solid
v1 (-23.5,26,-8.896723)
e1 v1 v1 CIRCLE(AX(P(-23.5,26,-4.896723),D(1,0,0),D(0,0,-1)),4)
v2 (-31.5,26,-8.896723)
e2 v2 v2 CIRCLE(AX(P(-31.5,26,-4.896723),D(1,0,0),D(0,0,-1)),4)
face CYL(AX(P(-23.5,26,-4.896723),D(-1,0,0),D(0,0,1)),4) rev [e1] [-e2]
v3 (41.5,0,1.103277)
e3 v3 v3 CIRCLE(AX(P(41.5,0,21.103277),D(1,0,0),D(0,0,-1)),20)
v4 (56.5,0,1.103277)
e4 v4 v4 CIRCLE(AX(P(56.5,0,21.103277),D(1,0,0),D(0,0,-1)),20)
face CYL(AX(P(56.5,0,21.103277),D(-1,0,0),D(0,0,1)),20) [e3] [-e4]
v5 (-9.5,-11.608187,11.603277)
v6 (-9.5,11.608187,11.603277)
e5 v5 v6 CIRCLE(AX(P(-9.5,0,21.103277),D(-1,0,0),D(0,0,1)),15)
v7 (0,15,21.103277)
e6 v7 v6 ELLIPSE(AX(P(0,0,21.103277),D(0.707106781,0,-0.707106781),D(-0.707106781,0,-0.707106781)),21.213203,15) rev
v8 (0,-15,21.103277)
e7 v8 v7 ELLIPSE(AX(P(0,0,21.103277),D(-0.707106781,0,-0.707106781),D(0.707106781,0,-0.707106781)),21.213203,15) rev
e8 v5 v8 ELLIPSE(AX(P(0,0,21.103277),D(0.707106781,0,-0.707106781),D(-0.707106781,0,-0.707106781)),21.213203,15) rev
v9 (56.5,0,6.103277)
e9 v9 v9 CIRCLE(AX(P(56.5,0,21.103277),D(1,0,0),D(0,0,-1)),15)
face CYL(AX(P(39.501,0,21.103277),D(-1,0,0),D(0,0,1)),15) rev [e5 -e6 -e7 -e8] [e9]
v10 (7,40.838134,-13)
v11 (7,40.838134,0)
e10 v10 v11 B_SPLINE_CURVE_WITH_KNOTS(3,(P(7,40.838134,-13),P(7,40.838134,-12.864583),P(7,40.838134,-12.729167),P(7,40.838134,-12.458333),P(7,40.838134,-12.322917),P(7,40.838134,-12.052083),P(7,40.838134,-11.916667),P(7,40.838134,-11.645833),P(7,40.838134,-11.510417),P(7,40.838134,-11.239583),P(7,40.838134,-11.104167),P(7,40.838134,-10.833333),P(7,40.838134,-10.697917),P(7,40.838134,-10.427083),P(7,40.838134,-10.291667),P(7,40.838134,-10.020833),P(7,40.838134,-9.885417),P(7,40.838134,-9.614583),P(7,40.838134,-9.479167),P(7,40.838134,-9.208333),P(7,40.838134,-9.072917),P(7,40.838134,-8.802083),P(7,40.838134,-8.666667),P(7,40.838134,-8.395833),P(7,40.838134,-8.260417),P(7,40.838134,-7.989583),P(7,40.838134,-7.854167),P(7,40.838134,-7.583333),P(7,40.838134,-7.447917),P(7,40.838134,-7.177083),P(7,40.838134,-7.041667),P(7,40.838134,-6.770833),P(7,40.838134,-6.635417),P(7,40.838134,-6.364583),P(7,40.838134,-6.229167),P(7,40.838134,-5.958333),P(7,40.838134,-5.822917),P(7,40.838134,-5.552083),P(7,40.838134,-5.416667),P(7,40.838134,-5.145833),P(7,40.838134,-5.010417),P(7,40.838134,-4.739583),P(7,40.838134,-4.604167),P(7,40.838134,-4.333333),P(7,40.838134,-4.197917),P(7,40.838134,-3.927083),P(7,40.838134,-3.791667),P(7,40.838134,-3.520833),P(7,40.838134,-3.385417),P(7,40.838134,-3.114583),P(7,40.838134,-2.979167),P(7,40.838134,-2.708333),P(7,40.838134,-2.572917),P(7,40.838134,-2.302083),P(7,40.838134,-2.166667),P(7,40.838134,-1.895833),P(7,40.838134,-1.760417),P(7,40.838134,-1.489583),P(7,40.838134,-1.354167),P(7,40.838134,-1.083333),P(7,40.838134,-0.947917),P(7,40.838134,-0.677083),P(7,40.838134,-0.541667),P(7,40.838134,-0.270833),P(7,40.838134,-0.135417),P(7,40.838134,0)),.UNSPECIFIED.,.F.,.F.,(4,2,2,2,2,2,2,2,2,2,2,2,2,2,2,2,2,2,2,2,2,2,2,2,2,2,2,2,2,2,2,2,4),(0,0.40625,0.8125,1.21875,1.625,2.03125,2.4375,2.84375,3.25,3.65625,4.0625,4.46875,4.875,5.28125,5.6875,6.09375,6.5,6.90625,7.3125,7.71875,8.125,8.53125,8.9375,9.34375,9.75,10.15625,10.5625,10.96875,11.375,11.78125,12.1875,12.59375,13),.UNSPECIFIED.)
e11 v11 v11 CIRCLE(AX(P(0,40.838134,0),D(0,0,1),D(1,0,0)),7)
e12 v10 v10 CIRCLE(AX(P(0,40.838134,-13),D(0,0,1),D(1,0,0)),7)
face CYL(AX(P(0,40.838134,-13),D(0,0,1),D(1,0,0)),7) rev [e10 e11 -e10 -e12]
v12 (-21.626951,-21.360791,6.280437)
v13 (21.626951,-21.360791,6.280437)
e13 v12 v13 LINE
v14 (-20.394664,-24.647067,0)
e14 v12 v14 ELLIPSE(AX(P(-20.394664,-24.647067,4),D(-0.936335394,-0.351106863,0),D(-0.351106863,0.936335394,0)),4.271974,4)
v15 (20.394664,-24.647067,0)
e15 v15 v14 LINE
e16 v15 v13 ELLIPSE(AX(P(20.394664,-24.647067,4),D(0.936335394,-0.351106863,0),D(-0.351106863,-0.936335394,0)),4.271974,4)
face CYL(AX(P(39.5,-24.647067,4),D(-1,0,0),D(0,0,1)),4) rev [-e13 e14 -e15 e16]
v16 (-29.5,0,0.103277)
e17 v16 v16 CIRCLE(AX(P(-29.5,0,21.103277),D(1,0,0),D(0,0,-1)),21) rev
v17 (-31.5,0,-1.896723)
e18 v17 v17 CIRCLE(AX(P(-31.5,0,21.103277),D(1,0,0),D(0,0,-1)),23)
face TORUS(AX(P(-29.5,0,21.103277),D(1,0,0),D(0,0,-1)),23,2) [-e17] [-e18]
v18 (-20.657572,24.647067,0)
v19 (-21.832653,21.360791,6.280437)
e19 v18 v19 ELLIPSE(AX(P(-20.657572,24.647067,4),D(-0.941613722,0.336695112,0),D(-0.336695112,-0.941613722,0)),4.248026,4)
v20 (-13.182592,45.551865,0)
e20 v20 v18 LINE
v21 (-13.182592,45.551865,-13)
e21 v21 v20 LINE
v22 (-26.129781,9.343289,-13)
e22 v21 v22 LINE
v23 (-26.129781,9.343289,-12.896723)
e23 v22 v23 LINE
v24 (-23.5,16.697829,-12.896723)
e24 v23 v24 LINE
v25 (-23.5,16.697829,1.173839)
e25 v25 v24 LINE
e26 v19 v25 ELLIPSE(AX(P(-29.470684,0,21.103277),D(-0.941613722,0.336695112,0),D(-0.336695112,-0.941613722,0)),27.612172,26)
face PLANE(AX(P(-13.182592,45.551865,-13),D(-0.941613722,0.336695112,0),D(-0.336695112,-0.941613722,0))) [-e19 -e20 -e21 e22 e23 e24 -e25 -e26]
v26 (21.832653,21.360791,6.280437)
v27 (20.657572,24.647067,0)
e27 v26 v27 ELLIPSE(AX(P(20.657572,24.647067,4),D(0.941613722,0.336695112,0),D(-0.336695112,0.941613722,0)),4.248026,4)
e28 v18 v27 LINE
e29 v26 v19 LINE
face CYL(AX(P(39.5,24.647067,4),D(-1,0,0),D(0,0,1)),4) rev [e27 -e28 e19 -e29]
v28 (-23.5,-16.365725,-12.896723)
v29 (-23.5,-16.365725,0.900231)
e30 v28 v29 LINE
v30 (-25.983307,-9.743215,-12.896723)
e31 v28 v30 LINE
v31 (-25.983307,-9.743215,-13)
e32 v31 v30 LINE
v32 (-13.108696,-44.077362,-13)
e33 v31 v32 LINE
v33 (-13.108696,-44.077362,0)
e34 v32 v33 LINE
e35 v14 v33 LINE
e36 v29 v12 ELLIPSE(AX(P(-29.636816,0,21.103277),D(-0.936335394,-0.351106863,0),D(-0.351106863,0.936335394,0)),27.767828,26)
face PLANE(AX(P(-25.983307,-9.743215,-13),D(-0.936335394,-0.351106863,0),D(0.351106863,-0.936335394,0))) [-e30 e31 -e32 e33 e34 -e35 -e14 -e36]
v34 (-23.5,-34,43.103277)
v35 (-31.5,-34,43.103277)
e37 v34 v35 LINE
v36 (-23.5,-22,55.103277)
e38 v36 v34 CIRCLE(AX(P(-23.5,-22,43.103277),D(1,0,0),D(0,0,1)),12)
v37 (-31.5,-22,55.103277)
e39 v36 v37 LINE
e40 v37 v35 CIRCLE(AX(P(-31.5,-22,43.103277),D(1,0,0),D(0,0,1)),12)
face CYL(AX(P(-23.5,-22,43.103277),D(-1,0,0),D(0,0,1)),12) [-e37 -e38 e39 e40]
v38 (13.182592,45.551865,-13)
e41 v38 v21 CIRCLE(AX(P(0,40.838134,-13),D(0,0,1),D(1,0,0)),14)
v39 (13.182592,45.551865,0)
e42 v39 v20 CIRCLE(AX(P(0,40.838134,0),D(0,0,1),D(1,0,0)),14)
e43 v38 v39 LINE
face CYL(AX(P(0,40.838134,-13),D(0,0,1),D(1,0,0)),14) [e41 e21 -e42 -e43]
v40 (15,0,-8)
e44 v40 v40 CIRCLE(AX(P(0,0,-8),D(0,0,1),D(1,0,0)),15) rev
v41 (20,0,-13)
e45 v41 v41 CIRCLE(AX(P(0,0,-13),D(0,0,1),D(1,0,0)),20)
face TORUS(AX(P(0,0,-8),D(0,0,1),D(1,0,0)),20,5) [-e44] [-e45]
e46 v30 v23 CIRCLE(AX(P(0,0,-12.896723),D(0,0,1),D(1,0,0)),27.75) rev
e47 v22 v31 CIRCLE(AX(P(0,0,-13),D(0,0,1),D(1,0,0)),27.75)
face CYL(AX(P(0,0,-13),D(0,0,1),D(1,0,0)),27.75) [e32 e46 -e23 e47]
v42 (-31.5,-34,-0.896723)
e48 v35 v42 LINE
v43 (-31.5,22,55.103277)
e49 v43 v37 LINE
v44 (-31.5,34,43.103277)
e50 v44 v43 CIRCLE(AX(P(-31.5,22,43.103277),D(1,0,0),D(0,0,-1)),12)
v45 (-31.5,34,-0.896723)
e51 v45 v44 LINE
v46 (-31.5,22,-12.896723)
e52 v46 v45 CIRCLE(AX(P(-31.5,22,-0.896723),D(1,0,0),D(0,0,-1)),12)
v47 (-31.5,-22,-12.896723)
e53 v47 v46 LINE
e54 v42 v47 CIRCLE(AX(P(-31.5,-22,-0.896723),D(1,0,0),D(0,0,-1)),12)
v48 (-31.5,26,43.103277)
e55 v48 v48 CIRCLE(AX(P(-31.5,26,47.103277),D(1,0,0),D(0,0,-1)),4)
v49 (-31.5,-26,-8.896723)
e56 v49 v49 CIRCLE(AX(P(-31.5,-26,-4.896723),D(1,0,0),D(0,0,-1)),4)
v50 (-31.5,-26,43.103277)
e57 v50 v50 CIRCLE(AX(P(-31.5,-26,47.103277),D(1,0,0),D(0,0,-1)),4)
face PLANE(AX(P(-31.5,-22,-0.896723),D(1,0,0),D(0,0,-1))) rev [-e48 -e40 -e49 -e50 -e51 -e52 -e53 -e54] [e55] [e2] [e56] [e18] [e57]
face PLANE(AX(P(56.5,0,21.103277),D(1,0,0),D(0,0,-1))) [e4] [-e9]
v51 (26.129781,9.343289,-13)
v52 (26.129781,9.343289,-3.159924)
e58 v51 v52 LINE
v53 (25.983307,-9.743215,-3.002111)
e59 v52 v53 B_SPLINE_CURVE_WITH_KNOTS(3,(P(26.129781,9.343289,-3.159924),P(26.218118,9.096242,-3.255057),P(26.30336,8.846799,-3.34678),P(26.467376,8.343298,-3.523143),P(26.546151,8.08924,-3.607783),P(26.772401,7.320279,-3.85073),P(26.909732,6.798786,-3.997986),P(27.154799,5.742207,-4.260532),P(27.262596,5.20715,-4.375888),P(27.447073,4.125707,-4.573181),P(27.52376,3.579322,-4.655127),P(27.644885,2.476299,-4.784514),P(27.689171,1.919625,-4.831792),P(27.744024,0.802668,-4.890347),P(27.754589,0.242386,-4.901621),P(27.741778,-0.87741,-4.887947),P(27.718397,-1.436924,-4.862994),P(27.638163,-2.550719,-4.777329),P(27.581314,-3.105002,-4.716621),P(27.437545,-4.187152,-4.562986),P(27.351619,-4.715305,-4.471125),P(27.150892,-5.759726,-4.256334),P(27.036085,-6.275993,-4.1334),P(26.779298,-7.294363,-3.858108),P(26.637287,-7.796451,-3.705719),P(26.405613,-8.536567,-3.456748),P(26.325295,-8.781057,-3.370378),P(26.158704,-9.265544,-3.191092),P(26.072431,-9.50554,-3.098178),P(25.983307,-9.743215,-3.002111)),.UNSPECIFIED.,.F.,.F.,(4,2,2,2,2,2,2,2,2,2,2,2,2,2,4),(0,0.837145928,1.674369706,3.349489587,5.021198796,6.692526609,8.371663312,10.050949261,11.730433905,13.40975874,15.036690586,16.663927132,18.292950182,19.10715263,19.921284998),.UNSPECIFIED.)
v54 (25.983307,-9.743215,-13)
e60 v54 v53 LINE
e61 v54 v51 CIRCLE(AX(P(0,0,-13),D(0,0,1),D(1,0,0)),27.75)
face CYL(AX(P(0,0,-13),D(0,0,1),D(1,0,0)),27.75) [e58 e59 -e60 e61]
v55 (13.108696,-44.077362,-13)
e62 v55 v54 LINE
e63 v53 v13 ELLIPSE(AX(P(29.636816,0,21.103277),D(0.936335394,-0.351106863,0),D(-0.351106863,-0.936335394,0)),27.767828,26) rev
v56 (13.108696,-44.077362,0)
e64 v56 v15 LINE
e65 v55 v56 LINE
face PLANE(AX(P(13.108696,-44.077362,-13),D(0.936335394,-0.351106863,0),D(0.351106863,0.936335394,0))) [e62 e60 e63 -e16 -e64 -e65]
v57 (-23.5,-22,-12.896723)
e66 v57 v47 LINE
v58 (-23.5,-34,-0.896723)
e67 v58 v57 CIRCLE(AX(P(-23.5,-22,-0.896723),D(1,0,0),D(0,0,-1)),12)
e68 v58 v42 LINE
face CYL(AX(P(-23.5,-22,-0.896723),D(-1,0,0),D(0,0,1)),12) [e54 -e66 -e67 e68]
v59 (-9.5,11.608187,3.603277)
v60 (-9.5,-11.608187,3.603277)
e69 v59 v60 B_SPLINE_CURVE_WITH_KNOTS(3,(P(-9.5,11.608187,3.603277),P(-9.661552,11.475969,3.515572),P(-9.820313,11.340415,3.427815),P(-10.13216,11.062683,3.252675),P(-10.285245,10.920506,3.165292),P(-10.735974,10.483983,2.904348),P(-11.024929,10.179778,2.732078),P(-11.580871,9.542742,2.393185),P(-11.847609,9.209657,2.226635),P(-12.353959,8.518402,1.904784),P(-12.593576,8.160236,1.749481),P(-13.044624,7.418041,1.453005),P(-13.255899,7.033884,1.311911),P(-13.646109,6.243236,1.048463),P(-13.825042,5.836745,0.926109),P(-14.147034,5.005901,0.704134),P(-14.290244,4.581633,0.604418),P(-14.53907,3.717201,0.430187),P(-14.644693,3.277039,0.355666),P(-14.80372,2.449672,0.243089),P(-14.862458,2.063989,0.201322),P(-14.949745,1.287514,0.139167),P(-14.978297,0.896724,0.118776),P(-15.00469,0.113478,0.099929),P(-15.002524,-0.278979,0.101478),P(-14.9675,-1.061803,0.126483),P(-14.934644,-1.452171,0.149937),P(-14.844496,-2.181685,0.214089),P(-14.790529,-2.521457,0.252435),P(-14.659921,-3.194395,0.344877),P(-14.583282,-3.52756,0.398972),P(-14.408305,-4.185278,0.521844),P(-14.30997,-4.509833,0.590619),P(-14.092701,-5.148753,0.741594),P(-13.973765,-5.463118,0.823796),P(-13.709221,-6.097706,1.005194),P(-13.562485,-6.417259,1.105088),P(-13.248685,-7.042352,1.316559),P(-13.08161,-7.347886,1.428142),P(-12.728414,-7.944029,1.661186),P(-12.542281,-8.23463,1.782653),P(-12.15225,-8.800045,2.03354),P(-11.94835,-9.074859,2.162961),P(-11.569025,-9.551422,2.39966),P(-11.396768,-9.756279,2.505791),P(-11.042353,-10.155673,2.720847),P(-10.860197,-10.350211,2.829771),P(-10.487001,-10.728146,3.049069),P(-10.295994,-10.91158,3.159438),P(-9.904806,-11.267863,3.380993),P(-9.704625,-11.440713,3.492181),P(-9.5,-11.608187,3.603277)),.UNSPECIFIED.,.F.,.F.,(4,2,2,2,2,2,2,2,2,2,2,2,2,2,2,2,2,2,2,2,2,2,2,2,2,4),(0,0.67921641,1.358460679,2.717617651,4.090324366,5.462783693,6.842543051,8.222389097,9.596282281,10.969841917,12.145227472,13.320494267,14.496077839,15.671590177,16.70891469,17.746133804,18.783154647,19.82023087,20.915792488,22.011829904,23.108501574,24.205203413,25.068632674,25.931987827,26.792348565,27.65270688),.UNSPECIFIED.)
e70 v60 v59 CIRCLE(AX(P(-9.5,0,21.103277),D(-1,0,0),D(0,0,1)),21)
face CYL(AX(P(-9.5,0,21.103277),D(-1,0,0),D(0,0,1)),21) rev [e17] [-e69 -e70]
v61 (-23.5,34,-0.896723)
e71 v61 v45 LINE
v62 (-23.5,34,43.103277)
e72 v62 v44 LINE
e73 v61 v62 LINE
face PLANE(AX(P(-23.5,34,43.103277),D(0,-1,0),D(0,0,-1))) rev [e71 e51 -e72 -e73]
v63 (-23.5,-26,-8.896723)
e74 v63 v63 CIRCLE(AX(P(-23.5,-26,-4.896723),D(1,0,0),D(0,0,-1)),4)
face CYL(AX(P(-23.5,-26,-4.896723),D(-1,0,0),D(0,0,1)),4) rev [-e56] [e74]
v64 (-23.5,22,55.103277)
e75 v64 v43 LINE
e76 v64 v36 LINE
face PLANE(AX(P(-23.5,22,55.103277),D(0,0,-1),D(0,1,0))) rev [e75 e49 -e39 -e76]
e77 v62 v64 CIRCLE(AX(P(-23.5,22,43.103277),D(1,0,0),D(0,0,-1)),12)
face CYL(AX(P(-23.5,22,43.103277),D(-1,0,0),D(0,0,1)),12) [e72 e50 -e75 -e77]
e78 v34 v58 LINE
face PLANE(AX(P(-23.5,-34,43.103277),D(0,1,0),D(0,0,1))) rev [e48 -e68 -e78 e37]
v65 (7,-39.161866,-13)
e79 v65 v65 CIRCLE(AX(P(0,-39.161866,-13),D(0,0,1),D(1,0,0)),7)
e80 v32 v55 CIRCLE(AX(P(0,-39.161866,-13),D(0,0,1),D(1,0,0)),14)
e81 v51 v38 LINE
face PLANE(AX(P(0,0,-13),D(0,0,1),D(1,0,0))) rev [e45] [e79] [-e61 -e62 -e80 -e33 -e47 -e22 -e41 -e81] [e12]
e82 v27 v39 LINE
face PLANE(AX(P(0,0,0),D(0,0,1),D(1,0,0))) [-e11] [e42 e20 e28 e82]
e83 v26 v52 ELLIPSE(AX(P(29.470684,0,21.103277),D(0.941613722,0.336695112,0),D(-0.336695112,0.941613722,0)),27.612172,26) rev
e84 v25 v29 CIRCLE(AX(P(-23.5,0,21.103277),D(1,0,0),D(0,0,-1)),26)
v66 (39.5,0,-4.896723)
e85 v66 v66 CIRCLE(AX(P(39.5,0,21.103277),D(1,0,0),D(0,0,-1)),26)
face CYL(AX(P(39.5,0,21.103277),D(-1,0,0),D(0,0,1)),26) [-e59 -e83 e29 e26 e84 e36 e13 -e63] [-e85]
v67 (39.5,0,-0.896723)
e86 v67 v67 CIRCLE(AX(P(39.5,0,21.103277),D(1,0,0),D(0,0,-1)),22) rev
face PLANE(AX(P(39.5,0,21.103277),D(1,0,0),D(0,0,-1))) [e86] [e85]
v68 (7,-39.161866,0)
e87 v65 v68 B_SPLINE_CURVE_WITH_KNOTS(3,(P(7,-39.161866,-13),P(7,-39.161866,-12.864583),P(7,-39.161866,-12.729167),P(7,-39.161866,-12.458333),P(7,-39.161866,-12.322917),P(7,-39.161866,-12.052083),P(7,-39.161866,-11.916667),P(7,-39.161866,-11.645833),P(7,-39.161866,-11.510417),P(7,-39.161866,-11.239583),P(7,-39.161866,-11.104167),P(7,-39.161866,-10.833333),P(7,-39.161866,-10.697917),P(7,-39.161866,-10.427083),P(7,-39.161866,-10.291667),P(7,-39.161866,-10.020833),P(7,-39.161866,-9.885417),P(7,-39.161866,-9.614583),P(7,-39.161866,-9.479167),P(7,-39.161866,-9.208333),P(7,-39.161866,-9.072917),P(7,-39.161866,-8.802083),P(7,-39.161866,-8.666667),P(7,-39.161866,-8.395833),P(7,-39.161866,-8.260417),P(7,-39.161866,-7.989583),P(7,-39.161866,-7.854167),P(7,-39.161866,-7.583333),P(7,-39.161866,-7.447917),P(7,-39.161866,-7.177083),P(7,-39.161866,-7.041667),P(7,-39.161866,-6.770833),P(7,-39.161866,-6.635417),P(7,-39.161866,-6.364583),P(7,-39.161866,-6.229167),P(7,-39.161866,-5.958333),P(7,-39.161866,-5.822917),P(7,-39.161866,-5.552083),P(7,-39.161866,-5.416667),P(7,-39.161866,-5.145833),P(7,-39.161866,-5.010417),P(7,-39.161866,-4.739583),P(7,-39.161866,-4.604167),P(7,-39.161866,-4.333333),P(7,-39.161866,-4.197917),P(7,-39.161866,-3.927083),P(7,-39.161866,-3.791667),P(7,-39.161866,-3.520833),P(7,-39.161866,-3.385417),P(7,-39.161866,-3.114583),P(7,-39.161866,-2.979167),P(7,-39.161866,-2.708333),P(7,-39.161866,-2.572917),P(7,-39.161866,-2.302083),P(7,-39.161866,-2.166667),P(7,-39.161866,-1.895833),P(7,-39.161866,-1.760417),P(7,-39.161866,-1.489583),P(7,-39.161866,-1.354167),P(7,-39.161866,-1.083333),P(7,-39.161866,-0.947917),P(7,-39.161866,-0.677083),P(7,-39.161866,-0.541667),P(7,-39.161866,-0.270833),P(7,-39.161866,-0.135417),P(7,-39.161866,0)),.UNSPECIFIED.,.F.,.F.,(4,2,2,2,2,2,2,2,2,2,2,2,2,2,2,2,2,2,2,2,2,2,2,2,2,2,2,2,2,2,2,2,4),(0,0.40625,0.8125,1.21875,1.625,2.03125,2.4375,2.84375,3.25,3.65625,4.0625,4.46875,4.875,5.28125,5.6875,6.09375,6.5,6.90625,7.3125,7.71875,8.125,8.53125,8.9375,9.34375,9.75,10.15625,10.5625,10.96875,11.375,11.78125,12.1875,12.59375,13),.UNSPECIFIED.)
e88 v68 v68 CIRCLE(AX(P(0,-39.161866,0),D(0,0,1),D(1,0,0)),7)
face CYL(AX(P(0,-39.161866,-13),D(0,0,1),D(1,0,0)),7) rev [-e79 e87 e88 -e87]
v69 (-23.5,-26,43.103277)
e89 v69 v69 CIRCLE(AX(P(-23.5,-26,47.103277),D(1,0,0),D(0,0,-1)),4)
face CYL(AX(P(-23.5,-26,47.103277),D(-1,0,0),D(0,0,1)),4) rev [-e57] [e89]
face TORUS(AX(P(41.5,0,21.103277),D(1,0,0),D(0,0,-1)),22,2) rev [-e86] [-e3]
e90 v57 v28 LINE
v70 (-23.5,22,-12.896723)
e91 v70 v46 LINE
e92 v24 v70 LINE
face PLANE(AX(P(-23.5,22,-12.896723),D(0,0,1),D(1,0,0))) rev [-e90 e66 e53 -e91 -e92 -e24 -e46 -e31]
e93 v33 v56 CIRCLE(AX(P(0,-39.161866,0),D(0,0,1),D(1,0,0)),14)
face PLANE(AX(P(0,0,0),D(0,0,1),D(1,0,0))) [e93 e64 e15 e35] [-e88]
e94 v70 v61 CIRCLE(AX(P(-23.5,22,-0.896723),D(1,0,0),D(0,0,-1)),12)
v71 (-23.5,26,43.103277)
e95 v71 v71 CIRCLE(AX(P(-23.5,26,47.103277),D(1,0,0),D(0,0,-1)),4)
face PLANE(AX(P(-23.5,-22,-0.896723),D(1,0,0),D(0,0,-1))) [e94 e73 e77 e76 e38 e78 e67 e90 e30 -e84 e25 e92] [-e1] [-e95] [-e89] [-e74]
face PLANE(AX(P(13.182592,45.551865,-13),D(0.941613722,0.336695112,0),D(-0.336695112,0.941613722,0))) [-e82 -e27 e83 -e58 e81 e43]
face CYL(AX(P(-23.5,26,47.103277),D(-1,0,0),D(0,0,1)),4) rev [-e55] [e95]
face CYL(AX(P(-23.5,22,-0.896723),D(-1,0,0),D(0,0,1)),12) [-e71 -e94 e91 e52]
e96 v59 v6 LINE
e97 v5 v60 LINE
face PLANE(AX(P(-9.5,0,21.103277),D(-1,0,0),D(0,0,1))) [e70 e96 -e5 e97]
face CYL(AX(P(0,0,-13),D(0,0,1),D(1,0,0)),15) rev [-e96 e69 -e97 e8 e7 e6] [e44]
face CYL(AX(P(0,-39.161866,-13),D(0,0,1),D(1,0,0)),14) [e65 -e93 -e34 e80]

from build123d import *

# Parameters (mm, degrees)
SKETCH1_R           = 7
SKETCH1_R_2         = 15
BOSS_EXTRUDE1_DEPTH = 13
SKETCH2_R           = 4
BOSS_EXTRUDE2_DEPTH = 4
SKETCH5_R           = 26
BOSS_EXTRUDE3_DEPTH = 63
FILLET6_R           = 4
FILLET7_R           = 4
SKETCH6_R           = 21
CUT_EXTRUDE1_DEPTH  = 22
CUT_EXTRUDE2_REACH  = 93.894
SKETCH7_R           = 15
BOSS_EXTRUDE4_START = -43
SKETCH9_R           = 15
BOSS_EXTRUDE4_DEPTH = 43
FILLET10_R          = 2
SKETCH12_R          = 20
BOSS_EXTRUDE5_DEPTH = 17
FILLET14_R          = 2
CUT_EXTRUDE4_REACH  = 119.421
SKETCH16_R          = 15
CUT_EXTRUDE5_REACH  = 106.103
SKETCH17_R          = 15
FILLET17_R          = 5


with BuildPart() as part:
    # Sketch1 → Boss-Extrude1 (new body)
    with BuildSketch(Plane.XY):
        with BuildLine():
            Line((-13.182592111, 45.551865312), (-26.129780791, 9.343289347))
            ThreePointArc((-26.129780791, 9.343289347), (-27.749182892, -0.212952692), (-25.983307196, -9.743215442))
            Line((-25.983307196, -9.743215442), (-13.108695522, -44.07736233))
            ThreePointArc((-13.108695522, -44.07736233), (0, -53.161866251), (13.108695522, -44.07736233))
            Line((13.108695522, -44.07736233), (25.983307196, -9.743215442))
            ThreePointArc((25.983307196, -9.743215442), (27.749182892, -0.212952692), (26.129780791, 9.343289347))
            Line((26.129780791, 9.343289347), (13.182592111, 45.551865312))
            ThreePointArc((13.182592111, 45.551865312), (0, 54.838133749), (-13.182592111, 45.551865312))
        make_face()
        with Locations((0, 40.838133749)):
            Circle(SKETCH1_R, mode=Mode.SUBTRACT)
        with Locations((0, -39.161866251)):
            Circle(SKETCH1_R, mode=Mode.SUBTRACT)
        Circle(SKETCH1_R_2, mode=Mode.SUBTRACT)
    extrude(amount=-BOSS_EXTRUDE1_DEPTH)



with BuildPart() as body_2:
    # Sketch2 → Boss-Extrude2 (new, symmetric)
    with BuildSketch(Plane(origin=(-27.5, 0, 0), x_dir=(0, 0, -1), z_dir=(1, 0, 0))):
        with BuildLine():
            Line((-43.103277086, 34), (0.896722914, 34))
            ThreePointArc((0.896722914, 34), (9.382004289, 30.485281374), (12.896722914, 22))
            Line((12.896722914, 22), (12.896722914, -22))
            ThreePointArc((12.896722914, -22), (9.382004289, -30.485281374), (0.896722914, -34))
            Line((0.896722914, -34), (-43.103277086, -34))
            ThreePointArc((-43.103277086, -34), (-51.58855846, -30.485281374), (-55.103277086, -22))
            Line((-55.103277086, -22), (-55.103277086, 22))
            ThreePointArc((-55.103277086, 22), (-51.58855846, 30.485281374), (-43.103277086, 34))
        make_face()
        with Locations((-47.103277086, 26)):
            Circle(SKETCH2_R, mode=Mode.SUBTRACT)
        with Locations((-47.103277086, -26)):
            Circle(SKETCH2_R, mode=Mode.SUBTRACT)
        with Locations((4.896722914, 26)):
            Circle(SKETCH2_R, mode=Mode.SUBTRACT)
        with Locations((4.896722914, -26)):
            Circle(SKETCH2_R, mode=Mode.SUBTRACT)
    extrude(amount=BOSS_EXTRUDE2_DEPTH, both=True)


with BuildPart() as part_1:
    add(part.part)

    add(body_2.part)  # Boss-Extrude3 merges body 2
    # Sketch5 → Boss-Extrude3 (add)
    with BuildSketch(Plane(origin=(-23.5, 0, 0), x_dir=(0, 0, -1), z_dir=(1, 0, 0))):
        with Locations(Location((-21.103277086, 0, 0), (0, 0, 324.258878137))):
            Circle(SKETCH5_R)
    extrude(amount=BOSS_EXTRUDE3_DEPTH)

    # Fillet6
    # the kernel refuses this fillet: 4 mm, written as the material it adds along each edge
    with BuildSketch(Plane(origin=(-47.149613866, -15.187221479, 0), x_dir=(0, -0.701013336910265, 0.7131481623575392), z_dir=(1, 0, 0))) as fillet6_piece_1_section:
        with BuildLine():
            CenterArc((9.484070542, 3.94221812), FILLET6_R, 135.491639194, 124.757843476)
            Line((6.631477893, 6.746271467), (0, 0))
            ThreePointArc((0, 0), (4.403318466, 0.375582222), (8.806636932, 0))
        make_face()
    fillet6_piece_1 = extrude(amount=94.74114261, mode=Mode.PRIVATE)
    fillet6_piece_1 = split(fillet6_piece_1, bisect_by=Plane(origin=(19.603312595, -26.757450692, 1.537679947), z_dir=(-0.9363353944532133, 0.35110686278417497, 0)), keep=Keep.TOP, mode=Mode.PRIVATE)
    fillet6_piece_1 = split(fillet6_piece_1, bisect_by=Plane(origin=(-19.602415947, -26.759841882, 1.537679947), z_dir=(0.9363353944532126, 0.35110686278417685, 0)), keep=Keep.TOP, mode=Mode.PRIVATE)
    add(fillet6_piece_1)

    # Fillet7
    # the kernel refuses this fillet: 4 mm, written as the material it adds along each edge
    with BuildSketch(Plane(origin=(47.689765613, 15.187221479, 0), x_dir=(0, 1, 0), z_dir=(-1, 0, 0))) as fillet7_piece_1_section:
        with BuildLine():
            CenterArc((9.459845546, -4), FILLET7_R, 90, 124.757843476)
            ThreePointArc((6.173569943, -6.280436945), (3.354630742, -2.876930326), (0, 0))
            Line((0, 0), (9.459845546, 0))
        make_face()
    fillet7_piece_1 = extrude(amount=94.839379478, mode=Mode.PRIVATE)
    fillet7_piece_1 = split(fillet7_piece_1, bisect_by=Plane(origin=(-19.975054308, 26.555819952, 1.538101515), z_dir=(0.941613722197052, -0.33669511159239174, 0)), keep=Keep.TOP, mode=Mode.PRIVATE)
    fillet7_piece_1 = split(fillet7_piece_1, bisect_by=Plane(origin=(19.97656332, 26.551599793, 1.538101515), z_dir=(-0.9416137221970524, -0.3366951115923907, 0)), keep=Keep.TOP, mode=Mode.PRIVATE)
    add(fillet7_piece_1)

    # Sketch6 → Cut-Extrude1 (cut)
    with BuildSketch(Plane.ZY.offset(31.5)):
        with Locations((21.103277086, 0)):
            Circle(SKETCH6_R)
    extrude(amount=-CUT_EXTRUDE1_DEPTH, mode=Mode.SUBTRACT)

    # Sketch7 → Cut-Extrude2 (cut, up to next)
    with BuildSketch(Plane.ZY.offset(9.5), mode=Mode.PRIVATE) as cut_extrude2_sk1:
        with Locations((21.103277086, 0)):
            Circle(SKETCH7_R)
    cut_extrude2_tool1 = extrude(cut_extrude2_sk1.sketch, amount=-CUT_EXTRUDE2_REACH, mode=Mode.PRIVATE) & part_1.part
    add(cut_extrude2_tool1.solids().sort_by_distance((-9.5, 0, 21.103277))[0], mode=Mode.SUBTRACT)

    # Sketch9 → Boss-Extrude4 (add)
    with BuildSketch(Plane(origin=(39.5, 0, 0), x_dir=(0, 0, -1), z_dir=(1, 0, 0)).offset(BOSS_EXTRUDE4_START)):
        with Locations(Location((-21.103277086, 0, 0), (0, 0, 180))):
            Circle(SKETCH9_R)
    extrude(amount=BOSS_EXTRUDE4_DEPTH)

    # Fillet10
    fillet10_edges = [part_1.edges().sort_by_distance(p)[0] for p in [
        (-31.5, 0, 0.103277086),
    ]]
    fillet(fillet10_edges, radius=FILLET10_R)

    # Sketch12 → Boss-Extrude5 (add)
    with BuildSketch(Plane(origin=(39.5, 0, 0), x_dir=(0, 0, -1), z_dir=(1, 0, 0))):
        with Locations((-21.103277086, 0)):
            Circle(SKETCH12_R)
    extrude(amount=BOSS_EXTRUDE5_DEPTH)

    # Fillet14
    fillet14_edges = [part_1.edges().sort_by_distance(p)[0] for p in [
        (39.5, 0, 41.103277086),
    ]]
    fillet(fillet14_edges, radius=FILLET14_R)

    # Sketch16 → Cut-Extrude4 (cut, up to next)
    with BuildSketch(Plane(origin=(56.5, 0, 0), x_dir=(0, 0, -1), z_dir=(1, 0, 0)), mode=Mode.PRIVATE) as cut_extrude4_sk1:
        with Locations(Location((-21.103277086, 0, 0), (0, 0, 180))):
            Circle(SKETCH16_R)
    cut_extrude4_tool1 = extrude(cut_extrude4_sk1.sketch, amount=-CUT_EXTRUDE4_REACH, mode=Mode.PRIVATE) & part_1.part
    add(cut_extrude4_tool1.solids().sort_by_distance((56.5, 0, 21.103277))[0], mode=Mode.SUBTRACT)

    # Sketch17 → Cut-Extrude5 (cut, up to next)
    with BuildSketch(Plane(origin=(0, 0, -13), x_dir=(-1, 0, 0), z_dir=(0, 0, -1)), mode=Mode.PRIVATE) as cut_extrude5_sk1:
        with Locations(Location((0, 0, 0), (0, 0, 180))):
            Circle(SKETCH17_R)
    cut_extrude5_tool1 = extrude(cut_extrude5_sk1.sketch, amount=-CUT_EXTRUDE5_REACH, mode=Mode.PRIVATE) & part_1.part
    add(cut_extrude5_tool1.solids().sort_by_distance((0, 0, -13))[0], mode=Mode.SUBTRACT)

    # Fillet17
    fillet17_edges = [part_1.edges().sort_by_distance(p)[0] for p in [
        (-15, 0, -13),
    ]]
    fillet(fillet17_edges, radius=FILLET17_R)


solid = part_1.part
